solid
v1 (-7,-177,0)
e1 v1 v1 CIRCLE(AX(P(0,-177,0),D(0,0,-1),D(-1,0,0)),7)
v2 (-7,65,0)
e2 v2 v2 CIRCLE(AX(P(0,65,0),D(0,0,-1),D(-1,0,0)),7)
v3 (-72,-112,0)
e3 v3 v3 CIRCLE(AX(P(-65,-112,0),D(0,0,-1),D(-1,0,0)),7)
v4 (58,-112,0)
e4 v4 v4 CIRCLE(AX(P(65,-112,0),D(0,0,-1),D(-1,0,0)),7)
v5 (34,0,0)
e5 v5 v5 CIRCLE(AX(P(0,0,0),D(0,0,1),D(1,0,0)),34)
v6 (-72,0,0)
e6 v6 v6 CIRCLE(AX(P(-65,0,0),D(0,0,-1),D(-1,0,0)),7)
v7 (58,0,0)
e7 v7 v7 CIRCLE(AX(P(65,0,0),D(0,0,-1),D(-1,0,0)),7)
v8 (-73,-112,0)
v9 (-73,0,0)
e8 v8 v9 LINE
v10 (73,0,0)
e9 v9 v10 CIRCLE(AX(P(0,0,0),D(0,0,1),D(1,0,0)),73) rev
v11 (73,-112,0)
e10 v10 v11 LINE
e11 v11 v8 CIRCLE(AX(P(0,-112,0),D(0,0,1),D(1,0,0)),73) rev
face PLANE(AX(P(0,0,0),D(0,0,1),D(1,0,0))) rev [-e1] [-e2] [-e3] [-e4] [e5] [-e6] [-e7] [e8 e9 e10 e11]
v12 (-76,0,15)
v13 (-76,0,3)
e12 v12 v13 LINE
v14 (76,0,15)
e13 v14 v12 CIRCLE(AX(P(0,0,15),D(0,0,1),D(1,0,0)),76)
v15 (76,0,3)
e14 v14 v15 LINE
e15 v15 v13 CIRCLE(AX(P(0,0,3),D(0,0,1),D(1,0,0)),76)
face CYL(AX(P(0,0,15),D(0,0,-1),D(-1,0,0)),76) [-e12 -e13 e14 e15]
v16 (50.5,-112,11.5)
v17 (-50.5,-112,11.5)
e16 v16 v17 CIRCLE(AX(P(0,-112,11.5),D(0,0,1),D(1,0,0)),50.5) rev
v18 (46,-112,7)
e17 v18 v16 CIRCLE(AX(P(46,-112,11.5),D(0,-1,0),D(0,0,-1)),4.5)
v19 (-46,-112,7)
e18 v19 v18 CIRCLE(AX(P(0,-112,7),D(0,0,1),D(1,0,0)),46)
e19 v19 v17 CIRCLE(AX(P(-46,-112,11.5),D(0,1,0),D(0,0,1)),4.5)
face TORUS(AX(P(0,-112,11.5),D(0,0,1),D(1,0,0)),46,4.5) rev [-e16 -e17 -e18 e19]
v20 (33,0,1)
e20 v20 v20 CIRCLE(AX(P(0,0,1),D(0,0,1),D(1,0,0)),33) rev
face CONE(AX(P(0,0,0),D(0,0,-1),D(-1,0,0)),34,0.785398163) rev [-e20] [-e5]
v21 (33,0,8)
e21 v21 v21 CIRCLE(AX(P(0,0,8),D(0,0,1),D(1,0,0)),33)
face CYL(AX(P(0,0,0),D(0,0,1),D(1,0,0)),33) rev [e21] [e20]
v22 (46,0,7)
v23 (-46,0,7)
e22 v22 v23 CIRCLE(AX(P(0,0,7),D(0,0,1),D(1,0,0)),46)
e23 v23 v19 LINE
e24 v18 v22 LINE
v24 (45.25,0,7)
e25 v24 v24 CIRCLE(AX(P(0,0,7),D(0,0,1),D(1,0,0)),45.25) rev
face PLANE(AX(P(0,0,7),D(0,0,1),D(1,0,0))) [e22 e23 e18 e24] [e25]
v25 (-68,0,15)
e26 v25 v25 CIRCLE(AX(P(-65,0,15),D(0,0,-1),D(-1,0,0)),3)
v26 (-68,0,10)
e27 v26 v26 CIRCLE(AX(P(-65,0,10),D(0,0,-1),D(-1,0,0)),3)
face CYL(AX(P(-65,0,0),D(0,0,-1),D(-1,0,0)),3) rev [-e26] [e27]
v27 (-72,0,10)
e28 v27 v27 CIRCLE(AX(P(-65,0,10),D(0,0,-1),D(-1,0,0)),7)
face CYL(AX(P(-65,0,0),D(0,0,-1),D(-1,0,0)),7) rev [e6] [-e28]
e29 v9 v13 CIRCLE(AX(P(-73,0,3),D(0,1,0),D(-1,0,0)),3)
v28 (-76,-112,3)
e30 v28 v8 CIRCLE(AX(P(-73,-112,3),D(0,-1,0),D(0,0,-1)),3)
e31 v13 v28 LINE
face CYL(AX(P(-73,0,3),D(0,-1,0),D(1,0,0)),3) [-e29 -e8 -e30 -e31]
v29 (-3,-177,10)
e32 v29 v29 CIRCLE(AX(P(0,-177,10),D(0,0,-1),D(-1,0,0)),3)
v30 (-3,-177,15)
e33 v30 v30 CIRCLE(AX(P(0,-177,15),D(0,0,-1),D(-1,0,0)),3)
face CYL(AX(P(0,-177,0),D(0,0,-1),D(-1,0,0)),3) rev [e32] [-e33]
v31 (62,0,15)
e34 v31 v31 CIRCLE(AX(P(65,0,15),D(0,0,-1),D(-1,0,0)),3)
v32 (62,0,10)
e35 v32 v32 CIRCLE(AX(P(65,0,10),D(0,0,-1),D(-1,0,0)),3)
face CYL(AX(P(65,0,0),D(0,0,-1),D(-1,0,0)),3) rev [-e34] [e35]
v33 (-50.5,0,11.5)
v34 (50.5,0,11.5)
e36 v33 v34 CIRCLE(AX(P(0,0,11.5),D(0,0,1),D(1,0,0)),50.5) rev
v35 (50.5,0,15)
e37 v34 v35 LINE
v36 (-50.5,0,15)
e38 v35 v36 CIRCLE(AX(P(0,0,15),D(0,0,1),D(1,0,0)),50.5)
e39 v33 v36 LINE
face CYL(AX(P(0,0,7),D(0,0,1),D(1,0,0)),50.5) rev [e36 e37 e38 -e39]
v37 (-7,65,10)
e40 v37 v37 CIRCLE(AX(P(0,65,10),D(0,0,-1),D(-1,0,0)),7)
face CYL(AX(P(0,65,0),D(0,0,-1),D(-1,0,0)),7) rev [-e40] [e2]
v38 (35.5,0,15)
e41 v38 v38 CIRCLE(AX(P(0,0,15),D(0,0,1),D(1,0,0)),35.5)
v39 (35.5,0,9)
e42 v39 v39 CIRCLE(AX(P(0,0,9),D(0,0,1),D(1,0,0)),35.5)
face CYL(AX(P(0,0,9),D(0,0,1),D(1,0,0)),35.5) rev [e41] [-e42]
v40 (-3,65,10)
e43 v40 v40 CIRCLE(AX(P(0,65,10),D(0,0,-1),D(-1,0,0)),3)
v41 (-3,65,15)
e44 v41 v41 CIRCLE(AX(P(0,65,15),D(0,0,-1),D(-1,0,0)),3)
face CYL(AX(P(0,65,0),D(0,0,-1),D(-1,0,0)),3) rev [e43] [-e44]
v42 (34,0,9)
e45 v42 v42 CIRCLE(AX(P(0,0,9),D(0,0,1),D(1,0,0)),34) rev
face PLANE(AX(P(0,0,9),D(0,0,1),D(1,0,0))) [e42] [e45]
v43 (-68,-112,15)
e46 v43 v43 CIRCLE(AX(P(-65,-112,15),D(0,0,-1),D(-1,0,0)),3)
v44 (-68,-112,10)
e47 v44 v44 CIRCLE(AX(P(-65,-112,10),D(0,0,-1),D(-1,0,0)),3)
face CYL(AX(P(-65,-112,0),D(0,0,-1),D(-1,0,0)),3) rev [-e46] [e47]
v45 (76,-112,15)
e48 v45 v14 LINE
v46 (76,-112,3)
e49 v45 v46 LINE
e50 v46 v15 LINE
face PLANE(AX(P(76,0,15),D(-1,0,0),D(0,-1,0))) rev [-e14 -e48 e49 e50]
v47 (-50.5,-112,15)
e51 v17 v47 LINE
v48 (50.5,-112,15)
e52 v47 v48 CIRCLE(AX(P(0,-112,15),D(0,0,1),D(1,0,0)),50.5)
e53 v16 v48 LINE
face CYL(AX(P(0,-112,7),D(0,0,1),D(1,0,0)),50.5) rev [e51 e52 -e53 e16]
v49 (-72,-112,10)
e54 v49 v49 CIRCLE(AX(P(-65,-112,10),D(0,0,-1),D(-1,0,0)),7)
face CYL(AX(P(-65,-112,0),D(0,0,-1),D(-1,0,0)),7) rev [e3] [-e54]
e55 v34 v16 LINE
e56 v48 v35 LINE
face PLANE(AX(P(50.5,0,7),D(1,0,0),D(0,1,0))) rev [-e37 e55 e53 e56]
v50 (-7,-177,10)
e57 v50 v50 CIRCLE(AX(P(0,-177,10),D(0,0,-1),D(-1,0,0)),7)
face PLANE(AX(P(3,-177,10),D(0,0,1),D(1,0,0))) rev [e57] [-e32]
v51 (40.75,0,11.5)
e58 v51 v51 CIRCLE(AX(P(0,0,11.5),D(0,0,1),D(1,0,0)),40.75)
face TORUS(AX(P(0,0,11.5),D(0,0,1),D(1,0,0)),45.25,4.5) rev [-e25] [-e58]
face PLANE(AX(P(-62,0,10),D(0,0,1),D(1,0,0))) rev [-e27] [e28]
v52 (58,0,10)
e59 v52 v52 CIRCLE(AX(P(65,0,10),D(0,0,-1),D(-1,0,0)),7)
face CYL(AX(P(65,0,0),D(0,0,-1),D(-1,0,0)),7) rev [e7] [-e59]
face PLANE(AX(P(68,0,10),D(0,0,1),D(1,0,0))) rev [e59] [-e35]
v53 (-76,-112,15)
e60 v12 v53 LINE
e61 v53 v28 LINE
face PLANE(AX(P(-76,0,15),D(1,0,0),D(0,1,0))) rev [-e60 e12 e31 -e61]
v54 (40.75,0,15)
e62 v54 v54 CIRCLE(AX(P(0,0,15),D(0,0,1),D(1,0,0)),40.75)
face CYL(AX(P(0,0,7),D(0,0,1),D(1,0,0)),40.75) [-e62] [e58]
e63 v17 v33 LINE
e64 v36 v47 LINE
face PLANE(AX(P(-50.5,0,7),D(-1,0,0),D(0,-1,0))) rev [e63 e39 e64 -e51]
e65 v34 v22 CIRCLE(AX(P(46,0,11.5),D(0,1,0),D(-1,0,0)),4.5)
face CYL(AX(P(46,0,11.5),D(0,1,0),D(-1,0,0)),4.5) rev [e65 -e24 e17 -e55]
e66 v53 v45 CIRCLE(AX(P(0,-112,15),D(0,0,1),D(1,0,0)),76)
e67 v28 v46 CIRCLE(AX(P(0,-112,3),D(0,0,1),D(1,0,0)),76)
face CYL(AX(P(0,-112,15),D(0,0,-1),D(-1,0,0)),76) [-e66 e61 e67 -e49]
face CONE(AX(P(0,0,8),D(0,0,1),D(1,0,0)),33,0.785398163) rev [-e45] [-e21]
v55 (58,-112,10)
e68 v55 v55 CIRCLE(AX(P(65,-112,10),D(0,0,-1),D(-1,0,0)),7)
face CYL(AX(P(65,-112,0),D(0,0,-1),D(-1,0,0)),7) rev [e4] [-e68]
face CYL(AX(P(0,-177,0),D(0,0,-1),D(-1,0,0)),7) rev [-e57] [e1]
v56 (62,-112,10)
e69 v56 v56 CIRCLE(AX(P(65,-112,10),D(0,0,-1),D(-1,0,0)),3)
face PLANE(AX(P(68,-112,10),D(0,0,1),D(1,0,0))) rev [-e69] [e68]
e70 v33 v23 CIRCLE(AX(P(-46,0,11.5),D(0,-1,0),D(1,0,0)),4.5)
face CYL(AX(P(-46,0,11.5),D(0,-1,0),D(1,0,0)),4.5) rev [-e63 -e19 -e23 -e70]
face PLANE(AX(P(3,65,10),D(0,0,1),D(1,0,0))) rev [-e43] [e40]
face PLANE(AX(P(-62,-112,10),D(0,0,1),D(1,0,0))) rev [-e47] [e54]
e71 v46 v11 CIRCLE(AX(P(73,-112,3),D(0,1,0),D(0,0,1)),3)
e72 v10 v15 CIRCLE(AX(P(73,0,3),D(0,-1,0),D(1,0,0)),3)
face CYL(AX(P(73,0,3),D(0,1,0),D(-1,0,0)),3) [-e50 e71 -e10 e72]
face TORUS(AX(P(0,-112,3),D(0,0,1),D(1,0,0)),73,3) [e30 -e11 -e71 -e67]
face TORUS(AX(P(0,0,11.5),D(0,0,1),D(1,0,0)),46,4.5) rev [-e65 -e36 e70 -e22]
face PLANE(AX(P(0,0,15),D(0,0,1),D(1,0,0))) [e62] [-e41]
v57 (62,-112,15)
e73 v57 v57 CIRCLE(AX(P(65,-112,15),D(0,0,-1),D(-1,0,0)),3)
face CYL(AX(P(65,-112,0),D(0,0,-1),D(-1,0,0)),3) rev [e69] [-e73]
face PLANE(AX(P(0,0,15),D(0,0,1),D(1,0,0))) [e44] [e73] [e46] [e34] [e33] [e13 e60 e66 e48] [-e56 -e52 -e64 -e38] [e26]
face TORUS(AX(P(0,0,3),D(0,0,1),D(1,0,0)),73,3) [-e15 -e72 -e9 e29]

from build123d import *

# Parameters (mm, degrees)
EXTRUDE_1_DEPTH           = 15
SKETCH_2_R                = 40.75
CUT_EXTRUDE_1_DEPTH       = 8
SKETCH_3_R                = 35.5
CUT_EXTRUDE_2_DEPTH       = 6
SKETCH_4_R                = 33
CUT_EXTRUDE_3_DEPTH       = 203.98029461
CHAMFER_1_SIZE            = 1
FILLET_1_R                = 4.5
FILLET_2_R                = 3
HOLE_WIZARD_1_OUTLINE_R   = 7
HOLE_WIZARD_1_DEPTH       = 10
HOLE_START                = 10
HOLE_WIZARD_1_2_OUTLINE_R = 3
HOLE_WIZARD_1_2_DEPTH     = 5


# Read off the part's stored shape, not the designer's step: 孔1
with BuildPart() as part:
    # 草图1 → 凸台-拉伸1 (new body)
    with BuildSketch(Plane.XY):
        with BuildLine():
            Line((76, 0), (76, -112))
            ThreePointArc((76, -112), (0, -188), (-76, -112))
            Line((-76, -112), (-76, 0))
            ThreePointArc((-76, 0), (0, 76), (76, 0))
        make_face()
    extrude(amount=EXTRUDE_1_DEPTH)

    # 草图2 → 切除-拉伸1 (cut)
    with BuildSketch(Plane.XY.offset(15)):
        with BuildLine():
            Line((50.5, 0), (50.5, -112))
            ThreePointArc((50.5, -112), (0, -162.5), (-50.5, -112))
            Line((-50.5, -112), (-50.5, 0))
            ThreePointArc((-50.5, 0), (0, 50.5), (50.5, 0))
        make_face()
        Circle(SKETCH_2_R, mode=Mode.SUBTRACT)
    extrude(amount=-CUT_EXTRUDE_1_DEPTH, mode=Mode.SUBTRACT)

    # 草图3 → 切除-拉伸2 (cut)
    with BuildSketch(Plane.XY.offset(15)):
        Circle(SKETCH_3_R)
    extrude(amount=-CUT_EXTRUDE_2_DEPTH, mode=Mode.SUBTRACT)

    # 草图4 → 切除-拉伸3 (cut, through all)
    with BuildSketch(Plane.XY.offset(9)):
        Circle(SKETCH_4_R)
    extrude(amount=-CUT_EXTRUDE_3_DEPTH, mode=Mode.SUBTRACT)

    # 倒角1
    chamfer_1_edges = [part.edges().sort_by_distance(p)[0] for p in [
        (-33, 0, 0),
        (-33, 0, 9),
    ]]
    chamfer(chamfer_1_edges, length=CHAMFER_1_SIZE)

    # 圆角1
    fillet_1_edges = [part.edges().sort_by_distance(p)[0] for p in [
        (0, 50.5, 7),
        (50.5, -56, 7),
        (0, -162.5, 7),
        (-50.5, -56, 7),
        (-40.75, 0, 7),
    ]]
    fillet(fillet_1_edges, radius=FILLET_1_R)

    # 圆角2
    fillet_2_edges = [part.edges().sort_by_distance(p)[0] for p in [
        (76, -56, 0),
        (0, -188, 0),
        (-76, -56, 0),
        (0, 76, 0),
    ]]
    fillet(fillet_2_edges, radius=FILLET_2_R)

    # 孔1 outline → 孔1 (cut)
    with BuildSketch(Plane.XY):
        with Locations((0, 65)):
            Circle(HOLE_WIZARD_1_OUTLINE_R)
        with Locations((0, -177)):
            Circle(HOLE_WIZARD_1_OUTLINE_R)
        with Locations((-65, -112)):
            Circle(HOLE_WIZARD_1_OUTLINE_R)
        with Locations((-65, 0)):
            Circle(HOLE_WIZARD_1_OUTLINE_R)
        with Locations((65, -112)):
            Circle(HOLE_WIZARD_1_OUTLINE_R)
        with Locations((65, 0)):
            Circle(HOLE_WIZARD_1_OUTLINE_R)
    extrude(amount=HOLE_WIZARD_1_DEPTH, mode=Mode.SUBTRACT)

    # Hole Wizard 1 2 outline → Hole Wizard 1 2 (cut)
    with BuildSketch(Plane.XY.offset(HOLE_START)):
        with Locations((0, 65)):
            Circle(HOLE_WIZARD_1_2_OUTLINE_R)
        with Locations((0, -177)):
            Circle(HOLE_WIZARD_1_2_OUTLINE_R)
        with Locations((-65, -112)):
            Circle(HOLE_WIZARD_1_2_OUTLINE_R)
        with Locations((-65, 0)):
            Circle(HOLE_WIZARD_1_2_OUTLINE_R)
        with Locations((65, -112)):
            Circle(HOLE_WIZARD_1_2_OUTLINE_R)
        with Locations((65, 0)):
            Circle(HOLE_WIZARD_1_2_OUTLINE_R)
    extrude(amount=HOLE_WIZARD_1_2_DEPTH, mode=Mode.SUBTRACT)


solid = part.part
